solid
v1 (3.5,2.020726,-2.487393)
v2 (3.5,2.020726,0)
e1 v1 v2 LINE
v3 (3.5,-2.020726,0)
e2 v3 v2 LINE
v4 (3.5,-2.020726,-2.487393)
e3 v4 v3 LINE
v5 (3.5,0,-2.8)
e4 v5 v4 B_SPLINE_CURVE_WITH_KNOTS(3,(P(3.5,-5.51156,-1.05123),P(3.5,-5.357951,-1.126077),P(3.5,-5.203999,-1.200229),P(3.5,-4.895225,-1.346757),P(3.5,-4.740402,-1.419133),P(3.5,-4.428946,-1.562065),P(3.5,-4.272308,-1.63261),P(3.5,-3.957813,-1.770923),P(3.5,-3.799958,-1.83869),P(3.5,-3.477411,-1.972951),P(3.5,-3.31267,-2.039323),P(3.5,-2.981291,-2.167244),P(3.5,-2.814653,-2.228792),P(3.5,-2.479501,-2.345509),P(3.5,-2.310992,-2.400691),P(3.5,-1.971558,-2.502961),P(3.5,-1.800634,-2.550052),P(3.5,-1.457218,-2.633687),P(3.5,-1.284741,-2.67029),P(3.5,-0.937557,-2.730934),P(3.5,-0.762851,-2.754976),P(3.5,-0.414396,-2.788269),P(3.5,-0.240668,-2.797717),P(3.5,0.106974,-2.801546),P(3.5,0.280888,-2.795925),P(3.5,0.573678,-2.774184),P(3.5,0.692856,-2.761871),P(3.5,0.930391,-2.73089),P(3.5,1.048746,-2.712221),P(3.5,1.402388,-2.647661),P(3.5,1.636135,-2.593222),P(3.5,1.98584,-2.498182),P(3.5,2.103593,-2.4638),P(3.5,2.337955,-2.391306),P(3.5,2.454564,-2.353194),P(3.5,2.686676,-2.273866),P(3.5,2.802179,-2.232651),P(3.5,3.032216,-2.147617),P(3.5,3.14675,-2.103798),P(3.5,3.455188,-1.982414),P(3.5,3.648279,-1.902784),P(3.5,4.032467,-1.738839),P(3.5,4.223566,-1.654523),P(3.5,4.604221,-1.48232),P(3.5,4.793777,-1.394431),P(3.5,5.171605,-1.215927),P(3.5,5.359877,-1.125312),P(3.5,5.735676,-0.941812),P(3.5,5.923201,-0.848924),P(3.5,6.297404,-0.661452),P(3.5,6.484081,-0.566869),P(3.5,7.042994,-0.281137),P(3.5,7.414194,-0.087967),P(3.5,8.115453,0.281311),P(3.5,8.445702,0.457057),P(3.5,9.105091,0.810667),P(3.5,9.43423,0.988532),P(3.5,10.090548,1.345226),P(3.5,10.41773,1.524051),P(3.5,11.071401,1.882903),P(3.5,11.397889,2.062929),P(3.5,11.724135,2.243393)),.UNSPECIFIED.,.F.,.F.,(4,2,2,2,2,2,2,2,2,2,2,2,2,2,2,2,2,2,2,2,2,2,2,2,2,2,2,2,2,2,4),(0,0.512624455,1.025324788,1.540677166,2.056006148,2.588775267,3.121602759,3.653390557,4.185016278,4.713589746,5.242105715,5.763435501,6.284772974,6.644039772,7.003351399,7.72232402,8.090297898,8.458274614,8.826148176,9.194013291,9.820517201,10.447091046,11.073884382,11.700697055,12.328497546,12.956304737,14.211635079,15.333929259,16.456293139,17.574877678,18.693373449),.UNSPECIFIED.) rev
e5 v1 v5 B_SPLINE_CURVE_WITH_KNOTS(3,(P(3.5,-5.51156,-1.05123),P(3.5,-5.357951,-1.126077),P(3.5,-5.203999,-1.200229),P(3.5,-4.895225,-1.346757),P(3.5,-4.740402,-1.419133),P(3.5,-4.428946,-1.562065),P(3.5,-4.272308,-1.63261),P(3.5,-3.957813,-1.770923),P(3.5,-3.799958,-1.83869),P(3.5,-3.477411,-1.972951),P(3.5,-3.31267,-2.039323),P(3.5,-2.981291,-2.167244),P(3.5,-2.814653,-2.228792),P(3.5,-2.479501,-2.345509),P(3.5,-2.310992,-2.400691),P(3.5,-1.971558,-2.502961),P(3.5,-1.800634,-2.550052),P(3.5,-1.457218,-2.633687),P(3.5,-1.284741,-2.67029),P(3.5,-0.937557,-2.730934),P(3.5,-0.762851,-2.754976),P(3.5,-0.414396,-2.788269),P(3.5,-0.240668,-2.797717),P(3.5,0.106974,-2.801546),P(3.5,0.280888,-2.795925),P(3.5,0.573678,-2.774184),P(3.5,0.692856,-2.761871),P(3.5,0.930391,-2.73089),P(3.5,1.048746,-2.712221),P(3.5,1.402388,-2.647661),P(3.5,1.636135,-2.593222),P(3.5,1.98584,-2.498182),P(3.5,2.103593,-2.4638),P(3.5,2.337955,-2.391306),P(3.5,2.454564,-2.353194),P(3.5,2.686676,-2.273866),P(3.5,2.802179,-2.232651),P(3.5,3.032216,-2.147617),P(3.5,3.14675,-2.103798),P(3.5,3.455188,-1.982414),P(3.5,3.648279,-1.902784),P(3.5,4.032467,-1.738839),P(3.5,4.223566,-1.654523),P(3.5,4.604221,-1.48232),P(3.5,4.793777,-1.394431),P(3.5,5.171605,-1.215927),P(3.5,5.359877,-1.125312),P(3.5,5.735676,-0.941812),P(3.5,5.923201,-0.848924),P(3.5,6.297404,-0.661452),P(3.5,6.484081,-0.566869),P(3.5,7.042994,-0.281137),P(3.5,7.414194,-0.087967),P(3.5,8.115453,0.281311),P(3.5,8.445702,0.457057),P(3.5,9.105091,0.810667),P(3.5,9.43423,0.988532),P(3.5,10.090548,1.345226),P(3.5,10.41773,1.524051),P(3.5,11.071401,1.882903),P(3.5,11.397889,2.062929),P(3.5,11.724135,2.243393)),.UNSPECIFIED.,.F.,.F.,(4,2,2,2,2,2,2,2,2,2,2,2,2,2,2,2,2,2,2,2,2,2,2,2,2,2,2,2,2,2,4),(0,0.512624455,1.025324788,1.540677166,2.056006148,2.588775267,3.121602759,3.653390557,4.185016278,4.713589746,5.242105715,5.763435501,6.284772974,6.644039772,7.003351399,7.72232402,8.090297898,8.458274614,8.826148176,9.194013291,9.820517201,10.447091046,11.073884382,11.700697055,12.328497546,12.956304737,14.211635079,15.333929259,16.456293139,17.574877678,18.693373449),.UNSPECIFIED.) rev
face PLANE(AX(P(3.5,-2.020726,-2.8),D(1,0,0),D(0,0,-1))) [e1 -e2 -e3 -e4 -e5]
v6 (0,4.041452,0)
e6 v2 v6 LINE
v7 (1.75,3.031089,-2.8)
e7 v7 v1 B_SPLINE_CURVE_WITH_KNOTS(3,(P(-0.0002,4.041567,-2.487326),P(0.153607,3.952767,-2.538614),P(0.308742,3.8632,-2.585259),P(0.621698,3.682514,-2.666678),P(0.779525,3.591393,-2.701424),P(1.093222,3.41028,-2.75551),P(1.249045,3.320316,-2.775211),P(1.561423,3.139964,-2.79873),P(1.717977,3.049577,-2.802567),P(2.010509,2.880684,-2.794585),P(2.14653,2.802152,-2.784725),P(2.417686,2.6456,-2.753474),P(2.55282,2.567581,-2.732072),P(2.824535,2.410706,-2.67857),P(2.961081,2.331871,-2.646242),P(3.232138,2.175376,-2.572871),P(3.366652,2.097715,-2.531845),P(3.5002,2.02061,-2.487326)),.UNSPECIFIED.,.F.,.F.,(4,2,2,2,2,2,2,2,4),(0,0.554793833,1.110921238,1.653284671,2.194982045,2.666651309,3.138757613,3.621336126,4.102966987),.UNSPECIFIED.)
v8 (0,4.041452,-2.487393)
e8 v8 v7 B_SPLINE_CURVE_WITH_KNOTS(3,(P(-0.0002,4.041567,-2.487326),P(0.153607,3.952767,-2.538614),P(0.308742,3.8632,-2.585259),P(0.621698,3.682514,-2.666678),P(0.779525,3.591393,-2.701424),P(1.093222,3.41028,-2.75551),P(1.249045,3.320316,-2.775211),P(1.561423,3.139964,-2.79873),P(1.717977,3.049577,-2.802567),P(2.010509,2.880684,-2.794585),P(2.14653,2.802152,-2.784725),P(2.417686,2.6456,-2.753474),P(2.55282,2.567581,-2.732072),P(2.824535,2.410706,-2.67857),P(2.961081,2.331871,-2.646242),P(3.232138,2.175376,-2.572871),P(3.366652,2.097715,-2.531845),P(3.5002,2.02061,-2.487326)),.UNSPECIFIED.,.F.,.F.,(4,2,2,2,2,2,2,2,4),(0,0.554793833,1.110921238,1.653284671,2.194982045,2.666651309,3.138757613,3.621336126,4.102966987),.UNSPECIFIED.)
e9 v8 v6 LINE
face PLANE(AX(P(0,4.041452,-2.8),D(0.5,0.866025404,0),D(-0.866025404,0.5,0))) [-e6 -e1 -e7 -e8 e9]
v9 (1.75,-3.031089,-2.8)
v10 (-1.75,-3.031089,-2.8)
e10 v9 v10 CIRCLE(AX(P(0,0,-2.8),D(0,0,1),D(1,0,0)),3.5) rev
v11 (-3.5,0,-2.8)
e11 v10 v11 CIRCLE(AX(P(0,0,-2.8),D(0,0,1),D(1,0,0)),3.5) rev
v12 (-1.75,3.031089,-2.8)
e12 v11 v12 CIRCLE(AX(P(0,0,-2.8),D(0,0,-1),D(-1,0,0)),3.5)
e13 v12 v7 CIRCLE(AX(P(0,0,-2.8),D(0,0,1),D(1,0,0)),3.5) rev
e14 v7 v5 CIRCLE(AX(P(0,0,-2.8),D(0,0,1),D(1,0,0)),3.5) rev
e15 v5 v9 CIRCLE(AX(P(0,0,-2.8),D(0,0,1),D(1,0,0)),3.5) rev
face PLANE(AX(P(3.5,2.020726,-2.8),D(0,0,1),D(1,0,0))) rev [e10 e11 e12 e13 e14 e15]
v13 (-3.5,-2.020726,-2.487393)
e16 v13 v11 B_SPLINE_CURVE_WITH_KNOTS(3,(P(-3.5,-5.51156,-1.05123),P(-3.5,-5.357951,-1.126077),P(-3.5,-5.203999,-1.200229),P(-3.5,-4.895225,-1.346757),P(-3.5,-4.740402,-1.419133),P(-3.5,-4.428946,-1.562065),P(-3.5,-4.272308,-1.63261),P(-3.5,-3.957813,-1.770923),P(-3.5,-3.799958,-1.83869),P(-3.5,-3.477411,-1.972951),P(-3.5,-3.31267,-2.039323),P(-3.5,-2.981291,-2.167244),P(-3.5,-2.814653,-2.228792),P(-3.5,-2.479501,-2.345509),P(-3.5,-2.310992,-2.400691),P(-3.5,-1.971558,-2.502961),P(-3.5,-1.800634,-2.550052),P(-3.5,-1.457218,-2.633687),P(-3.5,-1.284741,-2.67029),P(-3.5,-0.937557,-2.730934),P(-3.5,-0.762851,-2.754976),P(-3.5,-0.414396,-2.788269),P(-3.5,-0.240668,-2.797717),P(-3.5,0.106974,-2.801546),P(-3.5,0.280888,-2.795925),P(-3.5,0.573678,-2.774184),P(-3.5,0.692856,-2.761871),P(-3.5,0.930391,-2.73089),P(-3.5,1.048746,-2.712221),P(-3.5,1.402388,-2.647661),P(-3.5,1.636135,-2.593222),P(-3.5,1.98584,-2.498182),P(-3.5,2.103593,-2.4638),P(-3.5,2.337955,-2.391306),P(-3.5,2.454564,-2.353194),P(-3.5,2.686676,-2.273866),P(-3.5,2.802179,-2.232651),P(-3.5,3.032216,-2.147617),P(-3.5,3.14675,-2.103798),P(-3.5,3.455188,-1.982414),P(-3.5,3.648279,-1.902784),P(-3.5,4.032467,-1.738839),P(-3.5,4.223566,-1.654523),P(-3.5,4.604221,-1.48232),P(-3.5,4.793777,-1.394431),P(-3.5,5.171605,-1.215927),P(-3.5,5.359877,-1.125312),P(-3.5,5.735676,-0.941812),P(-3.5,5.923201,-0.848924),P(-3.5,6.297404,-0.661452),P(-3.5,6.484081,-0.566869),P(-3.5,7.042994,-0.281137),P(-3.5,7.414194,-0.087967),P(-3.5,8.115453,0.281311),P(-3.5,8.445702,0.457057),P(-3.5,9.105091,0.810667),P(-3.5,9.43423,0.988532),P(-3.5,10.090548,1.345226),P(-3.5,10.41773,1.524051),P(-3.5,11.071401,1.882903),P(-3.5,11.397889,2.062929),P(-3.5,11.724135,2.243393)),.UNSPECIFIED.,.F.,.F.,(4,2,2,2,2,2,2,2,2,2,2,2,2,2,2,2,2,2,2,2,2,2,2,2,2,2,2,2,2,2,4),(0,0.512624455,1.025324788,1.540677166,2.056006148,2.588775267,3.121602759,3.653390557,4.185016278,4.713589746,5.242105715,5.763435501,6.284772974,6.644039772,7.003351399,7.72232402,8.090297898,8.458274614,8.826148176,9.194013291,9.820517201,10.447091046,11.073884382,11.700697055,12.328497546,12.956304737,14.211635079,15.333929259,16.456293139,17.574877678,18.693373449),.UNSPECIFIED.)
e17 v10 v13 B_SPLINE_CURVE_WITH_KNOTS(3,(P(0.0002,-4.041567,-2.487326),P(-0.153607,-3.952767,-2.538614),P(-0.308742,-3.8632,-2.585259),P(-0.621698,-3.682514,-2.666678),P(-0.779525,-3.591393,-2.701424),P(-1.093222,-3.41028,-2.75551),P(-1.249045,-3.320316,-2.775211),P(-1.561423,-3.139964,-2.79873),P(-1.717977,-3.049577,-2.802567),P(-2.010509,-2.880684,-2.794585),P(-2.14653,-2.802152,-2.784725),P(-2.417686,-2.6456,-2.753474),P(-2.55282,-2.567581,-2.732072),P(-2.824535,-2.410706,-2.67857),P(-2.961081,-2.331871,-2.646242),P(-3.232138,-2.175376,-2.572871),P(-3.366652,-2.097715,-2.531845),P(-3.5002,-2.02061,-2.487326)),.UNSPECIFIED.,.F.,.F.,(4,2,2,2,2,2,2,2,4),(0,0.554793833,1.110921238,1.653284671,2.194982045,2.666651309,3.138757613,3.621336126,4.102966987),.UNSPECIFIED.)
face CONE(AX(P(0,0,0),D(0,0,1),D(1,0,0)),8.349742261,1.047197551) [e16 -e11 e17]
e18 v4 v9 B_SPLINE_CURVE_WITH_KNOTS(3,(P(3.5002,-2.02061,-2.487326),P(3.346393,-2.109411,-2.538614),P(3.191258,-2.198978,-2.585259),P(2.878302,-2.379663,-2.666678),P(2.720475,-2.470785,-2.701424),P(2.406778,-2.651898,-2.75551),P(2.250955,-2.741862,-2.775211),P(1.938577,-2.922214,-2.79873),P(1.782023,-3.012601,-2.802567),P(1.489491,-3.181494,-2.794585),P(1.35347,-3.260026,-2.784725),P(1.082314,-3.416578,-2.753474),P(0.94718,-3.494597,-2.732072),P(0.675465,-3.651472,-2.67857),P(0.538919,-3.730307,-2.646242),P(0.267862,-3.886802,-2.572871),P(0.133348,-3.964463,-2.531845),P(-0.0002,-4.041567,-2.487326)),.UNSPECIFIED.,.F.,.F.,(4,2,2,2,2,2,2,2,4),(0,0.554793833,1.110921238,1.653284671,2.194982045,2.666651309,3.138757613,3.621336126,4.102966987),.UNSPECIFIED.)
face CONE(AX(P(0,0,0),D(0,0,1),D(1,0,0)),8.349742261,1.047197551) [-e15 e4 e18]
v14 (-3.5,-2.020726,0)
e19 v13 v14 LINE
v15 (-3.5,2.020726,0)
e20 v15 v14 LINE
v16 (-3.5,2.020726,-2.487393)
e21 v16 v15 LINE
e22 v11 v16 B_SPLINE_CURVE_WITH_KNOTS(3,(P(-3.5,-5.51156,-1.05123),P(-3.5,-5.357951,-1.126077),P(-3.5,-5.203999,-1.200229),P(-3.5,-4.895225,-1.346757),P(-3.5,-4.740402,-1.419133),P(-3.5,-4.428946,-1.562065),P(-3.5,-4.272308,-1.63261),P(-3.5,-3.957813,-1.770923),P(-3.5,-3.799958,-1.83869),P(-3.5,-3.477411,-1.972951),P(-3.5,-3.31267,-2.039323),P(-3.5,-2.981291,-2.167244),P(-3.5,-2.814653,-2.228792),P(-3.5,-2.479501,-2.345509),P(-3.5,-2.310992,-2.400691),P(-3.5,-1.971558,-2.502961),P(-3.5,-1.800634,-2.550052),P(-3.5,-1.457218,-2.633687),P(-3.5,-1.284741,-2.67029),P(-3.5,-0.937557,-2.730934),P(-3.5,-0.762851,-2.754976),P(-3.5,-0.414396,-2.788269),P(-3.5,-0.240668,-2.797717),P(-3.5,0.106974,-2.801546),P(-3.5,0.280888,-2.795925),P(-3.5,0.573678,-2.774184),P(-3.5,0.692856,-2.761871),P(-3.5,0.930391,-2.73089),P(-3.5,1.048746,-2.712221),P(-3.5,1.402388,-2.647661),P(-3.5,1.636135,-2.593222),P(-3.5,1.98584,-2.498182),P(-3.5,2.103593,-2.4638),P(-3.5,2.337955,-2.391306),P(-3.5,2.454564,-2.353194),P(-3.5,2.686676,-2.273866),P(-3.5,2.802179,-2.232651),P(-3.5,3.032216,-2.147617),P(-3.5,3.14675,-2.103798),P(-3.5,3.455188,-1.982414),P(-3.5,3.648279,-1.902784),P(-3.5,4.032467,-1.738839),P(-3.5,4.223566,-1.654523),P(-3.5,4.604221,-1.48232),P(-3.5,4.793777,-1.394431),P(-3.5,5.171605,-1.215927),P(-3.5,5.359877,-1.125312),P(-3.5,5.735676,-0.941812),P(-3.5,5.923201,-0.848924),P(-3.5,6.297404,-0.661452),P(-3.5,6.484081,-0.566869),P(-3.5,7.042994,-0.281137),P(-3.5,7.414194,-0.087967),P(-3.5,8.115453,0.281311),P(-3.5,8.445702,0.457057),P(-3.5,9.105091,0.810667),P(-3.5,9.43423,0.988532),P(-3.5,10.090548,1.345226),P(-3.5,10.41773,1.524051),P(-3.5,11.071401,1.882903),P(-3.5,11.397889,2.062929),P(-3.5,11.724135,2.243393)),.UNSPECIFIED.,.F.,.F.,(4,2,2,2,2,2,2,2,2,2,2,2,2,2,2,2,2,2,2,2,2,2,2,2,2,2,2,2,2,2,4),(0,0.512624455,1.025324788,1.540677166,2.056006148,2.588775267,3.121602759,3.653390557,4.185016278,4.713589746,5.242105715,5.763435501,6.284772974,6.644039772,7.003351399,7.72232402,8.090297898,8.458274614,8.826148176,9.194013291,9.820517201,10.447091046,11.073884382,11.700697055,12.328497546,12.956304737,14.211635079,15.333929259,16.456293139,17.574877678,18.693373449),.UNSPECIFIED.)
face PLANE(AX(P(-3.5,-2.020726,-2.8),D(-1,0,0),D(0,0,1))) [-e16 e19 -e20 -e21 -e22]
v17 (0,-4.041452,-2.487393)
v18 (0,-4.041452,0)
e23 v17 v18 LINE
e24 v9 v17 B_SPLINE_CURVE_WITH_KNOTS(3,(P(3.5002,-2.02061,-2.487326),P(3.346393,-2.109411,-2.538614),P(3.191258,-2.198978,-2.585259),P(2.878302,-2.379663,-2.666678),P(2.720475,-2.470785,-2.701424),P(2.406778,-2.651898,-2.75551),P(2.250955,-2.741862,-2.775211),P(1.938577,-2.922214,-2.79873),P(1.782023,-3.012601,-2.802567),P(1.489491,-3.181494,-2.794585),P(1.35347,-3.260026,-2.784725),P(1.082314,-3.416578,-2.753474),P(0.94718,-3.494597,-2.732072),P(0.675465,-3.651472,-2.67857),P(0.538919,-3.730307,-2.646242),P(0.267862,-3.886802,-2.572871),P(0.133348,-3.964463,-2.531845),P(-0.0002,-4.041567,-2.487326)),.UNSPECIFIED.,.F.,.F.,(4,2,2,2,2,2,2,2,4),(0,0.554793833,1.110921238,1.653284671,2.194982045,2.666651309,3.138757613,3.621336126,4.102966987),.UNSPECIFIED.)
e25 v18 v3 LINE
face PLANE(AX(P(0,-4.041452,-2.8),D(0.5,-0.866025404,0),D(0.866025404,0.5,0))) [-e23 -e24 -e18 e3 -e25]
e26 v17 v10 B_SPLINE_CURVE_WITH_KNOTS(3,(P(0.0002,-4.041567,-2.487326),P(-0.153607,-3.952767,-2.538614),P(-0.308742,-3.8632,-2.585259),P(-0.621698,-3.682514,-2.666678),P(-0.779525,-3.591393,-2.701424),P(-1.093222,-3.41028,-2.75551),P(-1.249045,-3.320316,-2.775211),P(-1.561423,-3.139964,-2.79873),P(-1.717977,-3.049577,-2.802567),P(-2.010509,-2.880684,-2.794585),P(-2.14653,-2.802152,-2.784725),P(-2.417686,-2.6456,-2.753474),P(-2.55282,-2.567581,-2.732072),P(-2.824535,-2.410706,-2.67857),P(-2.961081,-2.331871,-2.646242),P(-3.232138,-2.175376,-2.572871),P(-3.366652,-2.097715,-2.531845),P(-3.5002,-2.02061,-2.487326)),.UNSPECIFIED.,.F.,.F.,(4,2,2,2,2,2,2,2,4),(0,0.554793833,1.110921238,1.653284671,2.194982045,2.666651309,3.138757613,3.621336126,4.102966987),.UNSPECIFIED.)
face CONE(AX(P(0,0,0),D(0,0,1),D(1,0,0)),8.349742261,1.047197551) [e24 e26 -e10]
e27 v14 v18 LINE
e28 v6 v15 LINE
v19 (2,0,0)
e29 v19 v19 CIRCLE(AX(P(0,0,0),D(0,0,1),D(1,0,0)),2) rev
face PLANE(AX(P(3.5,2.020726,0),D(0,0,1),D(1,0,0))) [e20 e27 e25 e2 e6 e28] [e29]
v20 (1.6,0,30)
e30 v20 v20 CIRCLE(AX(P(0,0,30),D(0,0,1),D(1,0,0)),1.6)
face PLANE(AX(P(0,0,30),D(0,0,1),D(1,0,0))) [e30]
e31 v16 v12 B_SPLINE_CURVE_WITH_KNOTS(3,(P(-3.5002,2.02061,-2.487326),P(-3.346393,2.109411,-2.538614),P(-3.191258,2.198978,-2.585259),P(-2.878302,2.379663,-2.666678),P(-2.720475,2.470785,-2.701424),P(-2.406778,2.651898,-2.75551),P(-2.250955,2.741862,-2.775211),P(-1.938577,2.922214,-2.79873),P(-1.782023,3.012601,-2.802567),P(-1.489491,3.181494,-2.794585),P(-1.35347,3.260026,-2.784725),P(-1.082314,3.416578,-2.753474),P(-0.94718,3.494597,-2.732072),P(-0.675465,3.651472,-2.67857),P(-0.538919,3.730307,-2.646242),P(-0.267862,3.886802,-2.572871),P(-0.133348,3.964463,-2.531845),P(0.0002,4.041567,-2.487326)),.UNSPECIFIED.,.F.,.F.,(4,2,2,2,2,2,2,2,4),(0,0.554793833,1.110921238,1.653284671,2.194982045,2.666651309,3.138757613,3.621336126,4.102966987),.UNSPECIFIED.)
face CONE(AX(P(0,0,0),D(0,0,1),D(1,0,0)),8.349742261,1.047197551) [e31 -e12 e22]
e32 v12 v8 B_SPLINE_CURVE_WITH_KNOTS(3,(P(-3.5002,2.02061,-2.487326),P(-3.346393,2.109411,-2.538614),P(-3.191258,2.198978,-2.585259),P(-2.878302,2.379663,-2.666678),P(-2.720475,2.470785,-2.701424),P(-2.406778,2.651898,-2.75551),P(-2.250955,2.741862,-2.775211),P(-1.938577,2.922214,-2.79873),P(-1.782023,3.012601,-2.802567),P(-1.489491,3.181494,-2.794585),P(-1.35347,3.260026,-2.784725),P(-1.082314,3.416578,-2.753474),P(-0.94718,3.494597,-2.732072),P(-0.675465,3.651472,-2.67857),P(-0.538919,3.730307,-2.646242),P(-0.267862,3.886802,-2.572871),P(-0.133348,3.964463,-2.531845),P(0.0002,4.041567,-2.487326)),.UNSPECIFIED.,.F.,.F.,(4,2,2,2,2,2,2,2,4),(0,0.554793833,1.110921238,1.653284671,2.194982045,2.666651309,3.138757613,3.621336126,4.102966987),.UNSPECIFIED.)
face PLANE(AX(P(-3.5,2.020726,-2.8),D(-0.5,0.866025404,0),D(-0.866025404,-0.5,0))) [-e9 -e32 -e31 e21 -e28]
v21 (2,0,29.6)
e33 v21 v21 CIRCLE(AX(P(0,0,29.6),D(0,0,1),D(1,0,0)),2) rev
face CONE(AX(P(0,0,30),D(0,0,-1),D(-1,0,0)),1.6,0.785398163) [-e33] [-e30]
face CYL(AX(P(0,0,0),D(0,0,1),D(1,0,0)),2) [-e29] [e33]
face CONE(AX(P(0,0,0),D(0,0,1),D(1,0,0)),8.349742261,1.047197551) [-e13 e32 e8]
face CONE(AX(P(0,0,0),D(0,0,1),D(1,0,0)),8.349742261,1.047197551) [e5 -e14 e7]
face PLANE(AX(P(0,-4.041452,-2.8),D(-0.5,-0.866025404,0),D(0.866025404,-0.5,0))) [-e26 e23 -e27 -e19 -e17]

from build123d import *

# Parameters (mm, degrees)
ESQUISSE1_W        = 2
ESQUISSE1_H        = 30
BOSS_EXTRU_1_DEPTH = 2.8


with BuildPart() as part:
    # Esquisse1 → Base-Révolution (revolve)
    with BuildSketch(Plane(origin=(0, 0, 0), x_dir=(1, 0, 0), z_dir=(0, 1, 0))):
        with Locations((1, -15)):
            Rectangle(ESQUISSE1_W, ESQUISSE1_H)
    revolve(axis=Axis((0, 0, 0), (0, 0, 1)))

    # Chanfrein1: read off the stored shape, not the designer's step
    # Chanfrein1 outline → Chanfrein1 (revolve, cut)
    with BuildSketch(Plane.XZ):
        Polygon((2, 30), (1.6, 30), (2, 29.6), align=None)
    revolve(axis=Axis((0, 0, 0), (0, 0, 1)), mode=Mode.SUBTRACT)

    # Esquisse6 → Boss.-Extru.1 (add)
    with BuildSketch(Plane.XY):
        Polygon((3.5, -2.020725942), (3.5, 2.020725942), (0, 4.041451884), (-3.5, 2.020725942), (-3.5, -2.020725942), (0, -4.041451884), align=None)
    extrude(amount=-BOSS_EXTRU_1_DEPTH)

    # Esquisse7 → Enlèvement de matière-Révolution1 (revolve, cut)
    with BuildSketch(Plane(origin=(0, 0, 0), x_dir=(1, 0, 0), z_dir=(0, 1, 0))):
        Polygon((-3.5, 2.8), (-8.349742261, 2.8), (-8.349742261, 0), align=None)
    revolve(axis=Axis((0, 0, -6.239446496), (0, 0, 1)), mode=Mode.SUBTRACT)


solid = part.part
